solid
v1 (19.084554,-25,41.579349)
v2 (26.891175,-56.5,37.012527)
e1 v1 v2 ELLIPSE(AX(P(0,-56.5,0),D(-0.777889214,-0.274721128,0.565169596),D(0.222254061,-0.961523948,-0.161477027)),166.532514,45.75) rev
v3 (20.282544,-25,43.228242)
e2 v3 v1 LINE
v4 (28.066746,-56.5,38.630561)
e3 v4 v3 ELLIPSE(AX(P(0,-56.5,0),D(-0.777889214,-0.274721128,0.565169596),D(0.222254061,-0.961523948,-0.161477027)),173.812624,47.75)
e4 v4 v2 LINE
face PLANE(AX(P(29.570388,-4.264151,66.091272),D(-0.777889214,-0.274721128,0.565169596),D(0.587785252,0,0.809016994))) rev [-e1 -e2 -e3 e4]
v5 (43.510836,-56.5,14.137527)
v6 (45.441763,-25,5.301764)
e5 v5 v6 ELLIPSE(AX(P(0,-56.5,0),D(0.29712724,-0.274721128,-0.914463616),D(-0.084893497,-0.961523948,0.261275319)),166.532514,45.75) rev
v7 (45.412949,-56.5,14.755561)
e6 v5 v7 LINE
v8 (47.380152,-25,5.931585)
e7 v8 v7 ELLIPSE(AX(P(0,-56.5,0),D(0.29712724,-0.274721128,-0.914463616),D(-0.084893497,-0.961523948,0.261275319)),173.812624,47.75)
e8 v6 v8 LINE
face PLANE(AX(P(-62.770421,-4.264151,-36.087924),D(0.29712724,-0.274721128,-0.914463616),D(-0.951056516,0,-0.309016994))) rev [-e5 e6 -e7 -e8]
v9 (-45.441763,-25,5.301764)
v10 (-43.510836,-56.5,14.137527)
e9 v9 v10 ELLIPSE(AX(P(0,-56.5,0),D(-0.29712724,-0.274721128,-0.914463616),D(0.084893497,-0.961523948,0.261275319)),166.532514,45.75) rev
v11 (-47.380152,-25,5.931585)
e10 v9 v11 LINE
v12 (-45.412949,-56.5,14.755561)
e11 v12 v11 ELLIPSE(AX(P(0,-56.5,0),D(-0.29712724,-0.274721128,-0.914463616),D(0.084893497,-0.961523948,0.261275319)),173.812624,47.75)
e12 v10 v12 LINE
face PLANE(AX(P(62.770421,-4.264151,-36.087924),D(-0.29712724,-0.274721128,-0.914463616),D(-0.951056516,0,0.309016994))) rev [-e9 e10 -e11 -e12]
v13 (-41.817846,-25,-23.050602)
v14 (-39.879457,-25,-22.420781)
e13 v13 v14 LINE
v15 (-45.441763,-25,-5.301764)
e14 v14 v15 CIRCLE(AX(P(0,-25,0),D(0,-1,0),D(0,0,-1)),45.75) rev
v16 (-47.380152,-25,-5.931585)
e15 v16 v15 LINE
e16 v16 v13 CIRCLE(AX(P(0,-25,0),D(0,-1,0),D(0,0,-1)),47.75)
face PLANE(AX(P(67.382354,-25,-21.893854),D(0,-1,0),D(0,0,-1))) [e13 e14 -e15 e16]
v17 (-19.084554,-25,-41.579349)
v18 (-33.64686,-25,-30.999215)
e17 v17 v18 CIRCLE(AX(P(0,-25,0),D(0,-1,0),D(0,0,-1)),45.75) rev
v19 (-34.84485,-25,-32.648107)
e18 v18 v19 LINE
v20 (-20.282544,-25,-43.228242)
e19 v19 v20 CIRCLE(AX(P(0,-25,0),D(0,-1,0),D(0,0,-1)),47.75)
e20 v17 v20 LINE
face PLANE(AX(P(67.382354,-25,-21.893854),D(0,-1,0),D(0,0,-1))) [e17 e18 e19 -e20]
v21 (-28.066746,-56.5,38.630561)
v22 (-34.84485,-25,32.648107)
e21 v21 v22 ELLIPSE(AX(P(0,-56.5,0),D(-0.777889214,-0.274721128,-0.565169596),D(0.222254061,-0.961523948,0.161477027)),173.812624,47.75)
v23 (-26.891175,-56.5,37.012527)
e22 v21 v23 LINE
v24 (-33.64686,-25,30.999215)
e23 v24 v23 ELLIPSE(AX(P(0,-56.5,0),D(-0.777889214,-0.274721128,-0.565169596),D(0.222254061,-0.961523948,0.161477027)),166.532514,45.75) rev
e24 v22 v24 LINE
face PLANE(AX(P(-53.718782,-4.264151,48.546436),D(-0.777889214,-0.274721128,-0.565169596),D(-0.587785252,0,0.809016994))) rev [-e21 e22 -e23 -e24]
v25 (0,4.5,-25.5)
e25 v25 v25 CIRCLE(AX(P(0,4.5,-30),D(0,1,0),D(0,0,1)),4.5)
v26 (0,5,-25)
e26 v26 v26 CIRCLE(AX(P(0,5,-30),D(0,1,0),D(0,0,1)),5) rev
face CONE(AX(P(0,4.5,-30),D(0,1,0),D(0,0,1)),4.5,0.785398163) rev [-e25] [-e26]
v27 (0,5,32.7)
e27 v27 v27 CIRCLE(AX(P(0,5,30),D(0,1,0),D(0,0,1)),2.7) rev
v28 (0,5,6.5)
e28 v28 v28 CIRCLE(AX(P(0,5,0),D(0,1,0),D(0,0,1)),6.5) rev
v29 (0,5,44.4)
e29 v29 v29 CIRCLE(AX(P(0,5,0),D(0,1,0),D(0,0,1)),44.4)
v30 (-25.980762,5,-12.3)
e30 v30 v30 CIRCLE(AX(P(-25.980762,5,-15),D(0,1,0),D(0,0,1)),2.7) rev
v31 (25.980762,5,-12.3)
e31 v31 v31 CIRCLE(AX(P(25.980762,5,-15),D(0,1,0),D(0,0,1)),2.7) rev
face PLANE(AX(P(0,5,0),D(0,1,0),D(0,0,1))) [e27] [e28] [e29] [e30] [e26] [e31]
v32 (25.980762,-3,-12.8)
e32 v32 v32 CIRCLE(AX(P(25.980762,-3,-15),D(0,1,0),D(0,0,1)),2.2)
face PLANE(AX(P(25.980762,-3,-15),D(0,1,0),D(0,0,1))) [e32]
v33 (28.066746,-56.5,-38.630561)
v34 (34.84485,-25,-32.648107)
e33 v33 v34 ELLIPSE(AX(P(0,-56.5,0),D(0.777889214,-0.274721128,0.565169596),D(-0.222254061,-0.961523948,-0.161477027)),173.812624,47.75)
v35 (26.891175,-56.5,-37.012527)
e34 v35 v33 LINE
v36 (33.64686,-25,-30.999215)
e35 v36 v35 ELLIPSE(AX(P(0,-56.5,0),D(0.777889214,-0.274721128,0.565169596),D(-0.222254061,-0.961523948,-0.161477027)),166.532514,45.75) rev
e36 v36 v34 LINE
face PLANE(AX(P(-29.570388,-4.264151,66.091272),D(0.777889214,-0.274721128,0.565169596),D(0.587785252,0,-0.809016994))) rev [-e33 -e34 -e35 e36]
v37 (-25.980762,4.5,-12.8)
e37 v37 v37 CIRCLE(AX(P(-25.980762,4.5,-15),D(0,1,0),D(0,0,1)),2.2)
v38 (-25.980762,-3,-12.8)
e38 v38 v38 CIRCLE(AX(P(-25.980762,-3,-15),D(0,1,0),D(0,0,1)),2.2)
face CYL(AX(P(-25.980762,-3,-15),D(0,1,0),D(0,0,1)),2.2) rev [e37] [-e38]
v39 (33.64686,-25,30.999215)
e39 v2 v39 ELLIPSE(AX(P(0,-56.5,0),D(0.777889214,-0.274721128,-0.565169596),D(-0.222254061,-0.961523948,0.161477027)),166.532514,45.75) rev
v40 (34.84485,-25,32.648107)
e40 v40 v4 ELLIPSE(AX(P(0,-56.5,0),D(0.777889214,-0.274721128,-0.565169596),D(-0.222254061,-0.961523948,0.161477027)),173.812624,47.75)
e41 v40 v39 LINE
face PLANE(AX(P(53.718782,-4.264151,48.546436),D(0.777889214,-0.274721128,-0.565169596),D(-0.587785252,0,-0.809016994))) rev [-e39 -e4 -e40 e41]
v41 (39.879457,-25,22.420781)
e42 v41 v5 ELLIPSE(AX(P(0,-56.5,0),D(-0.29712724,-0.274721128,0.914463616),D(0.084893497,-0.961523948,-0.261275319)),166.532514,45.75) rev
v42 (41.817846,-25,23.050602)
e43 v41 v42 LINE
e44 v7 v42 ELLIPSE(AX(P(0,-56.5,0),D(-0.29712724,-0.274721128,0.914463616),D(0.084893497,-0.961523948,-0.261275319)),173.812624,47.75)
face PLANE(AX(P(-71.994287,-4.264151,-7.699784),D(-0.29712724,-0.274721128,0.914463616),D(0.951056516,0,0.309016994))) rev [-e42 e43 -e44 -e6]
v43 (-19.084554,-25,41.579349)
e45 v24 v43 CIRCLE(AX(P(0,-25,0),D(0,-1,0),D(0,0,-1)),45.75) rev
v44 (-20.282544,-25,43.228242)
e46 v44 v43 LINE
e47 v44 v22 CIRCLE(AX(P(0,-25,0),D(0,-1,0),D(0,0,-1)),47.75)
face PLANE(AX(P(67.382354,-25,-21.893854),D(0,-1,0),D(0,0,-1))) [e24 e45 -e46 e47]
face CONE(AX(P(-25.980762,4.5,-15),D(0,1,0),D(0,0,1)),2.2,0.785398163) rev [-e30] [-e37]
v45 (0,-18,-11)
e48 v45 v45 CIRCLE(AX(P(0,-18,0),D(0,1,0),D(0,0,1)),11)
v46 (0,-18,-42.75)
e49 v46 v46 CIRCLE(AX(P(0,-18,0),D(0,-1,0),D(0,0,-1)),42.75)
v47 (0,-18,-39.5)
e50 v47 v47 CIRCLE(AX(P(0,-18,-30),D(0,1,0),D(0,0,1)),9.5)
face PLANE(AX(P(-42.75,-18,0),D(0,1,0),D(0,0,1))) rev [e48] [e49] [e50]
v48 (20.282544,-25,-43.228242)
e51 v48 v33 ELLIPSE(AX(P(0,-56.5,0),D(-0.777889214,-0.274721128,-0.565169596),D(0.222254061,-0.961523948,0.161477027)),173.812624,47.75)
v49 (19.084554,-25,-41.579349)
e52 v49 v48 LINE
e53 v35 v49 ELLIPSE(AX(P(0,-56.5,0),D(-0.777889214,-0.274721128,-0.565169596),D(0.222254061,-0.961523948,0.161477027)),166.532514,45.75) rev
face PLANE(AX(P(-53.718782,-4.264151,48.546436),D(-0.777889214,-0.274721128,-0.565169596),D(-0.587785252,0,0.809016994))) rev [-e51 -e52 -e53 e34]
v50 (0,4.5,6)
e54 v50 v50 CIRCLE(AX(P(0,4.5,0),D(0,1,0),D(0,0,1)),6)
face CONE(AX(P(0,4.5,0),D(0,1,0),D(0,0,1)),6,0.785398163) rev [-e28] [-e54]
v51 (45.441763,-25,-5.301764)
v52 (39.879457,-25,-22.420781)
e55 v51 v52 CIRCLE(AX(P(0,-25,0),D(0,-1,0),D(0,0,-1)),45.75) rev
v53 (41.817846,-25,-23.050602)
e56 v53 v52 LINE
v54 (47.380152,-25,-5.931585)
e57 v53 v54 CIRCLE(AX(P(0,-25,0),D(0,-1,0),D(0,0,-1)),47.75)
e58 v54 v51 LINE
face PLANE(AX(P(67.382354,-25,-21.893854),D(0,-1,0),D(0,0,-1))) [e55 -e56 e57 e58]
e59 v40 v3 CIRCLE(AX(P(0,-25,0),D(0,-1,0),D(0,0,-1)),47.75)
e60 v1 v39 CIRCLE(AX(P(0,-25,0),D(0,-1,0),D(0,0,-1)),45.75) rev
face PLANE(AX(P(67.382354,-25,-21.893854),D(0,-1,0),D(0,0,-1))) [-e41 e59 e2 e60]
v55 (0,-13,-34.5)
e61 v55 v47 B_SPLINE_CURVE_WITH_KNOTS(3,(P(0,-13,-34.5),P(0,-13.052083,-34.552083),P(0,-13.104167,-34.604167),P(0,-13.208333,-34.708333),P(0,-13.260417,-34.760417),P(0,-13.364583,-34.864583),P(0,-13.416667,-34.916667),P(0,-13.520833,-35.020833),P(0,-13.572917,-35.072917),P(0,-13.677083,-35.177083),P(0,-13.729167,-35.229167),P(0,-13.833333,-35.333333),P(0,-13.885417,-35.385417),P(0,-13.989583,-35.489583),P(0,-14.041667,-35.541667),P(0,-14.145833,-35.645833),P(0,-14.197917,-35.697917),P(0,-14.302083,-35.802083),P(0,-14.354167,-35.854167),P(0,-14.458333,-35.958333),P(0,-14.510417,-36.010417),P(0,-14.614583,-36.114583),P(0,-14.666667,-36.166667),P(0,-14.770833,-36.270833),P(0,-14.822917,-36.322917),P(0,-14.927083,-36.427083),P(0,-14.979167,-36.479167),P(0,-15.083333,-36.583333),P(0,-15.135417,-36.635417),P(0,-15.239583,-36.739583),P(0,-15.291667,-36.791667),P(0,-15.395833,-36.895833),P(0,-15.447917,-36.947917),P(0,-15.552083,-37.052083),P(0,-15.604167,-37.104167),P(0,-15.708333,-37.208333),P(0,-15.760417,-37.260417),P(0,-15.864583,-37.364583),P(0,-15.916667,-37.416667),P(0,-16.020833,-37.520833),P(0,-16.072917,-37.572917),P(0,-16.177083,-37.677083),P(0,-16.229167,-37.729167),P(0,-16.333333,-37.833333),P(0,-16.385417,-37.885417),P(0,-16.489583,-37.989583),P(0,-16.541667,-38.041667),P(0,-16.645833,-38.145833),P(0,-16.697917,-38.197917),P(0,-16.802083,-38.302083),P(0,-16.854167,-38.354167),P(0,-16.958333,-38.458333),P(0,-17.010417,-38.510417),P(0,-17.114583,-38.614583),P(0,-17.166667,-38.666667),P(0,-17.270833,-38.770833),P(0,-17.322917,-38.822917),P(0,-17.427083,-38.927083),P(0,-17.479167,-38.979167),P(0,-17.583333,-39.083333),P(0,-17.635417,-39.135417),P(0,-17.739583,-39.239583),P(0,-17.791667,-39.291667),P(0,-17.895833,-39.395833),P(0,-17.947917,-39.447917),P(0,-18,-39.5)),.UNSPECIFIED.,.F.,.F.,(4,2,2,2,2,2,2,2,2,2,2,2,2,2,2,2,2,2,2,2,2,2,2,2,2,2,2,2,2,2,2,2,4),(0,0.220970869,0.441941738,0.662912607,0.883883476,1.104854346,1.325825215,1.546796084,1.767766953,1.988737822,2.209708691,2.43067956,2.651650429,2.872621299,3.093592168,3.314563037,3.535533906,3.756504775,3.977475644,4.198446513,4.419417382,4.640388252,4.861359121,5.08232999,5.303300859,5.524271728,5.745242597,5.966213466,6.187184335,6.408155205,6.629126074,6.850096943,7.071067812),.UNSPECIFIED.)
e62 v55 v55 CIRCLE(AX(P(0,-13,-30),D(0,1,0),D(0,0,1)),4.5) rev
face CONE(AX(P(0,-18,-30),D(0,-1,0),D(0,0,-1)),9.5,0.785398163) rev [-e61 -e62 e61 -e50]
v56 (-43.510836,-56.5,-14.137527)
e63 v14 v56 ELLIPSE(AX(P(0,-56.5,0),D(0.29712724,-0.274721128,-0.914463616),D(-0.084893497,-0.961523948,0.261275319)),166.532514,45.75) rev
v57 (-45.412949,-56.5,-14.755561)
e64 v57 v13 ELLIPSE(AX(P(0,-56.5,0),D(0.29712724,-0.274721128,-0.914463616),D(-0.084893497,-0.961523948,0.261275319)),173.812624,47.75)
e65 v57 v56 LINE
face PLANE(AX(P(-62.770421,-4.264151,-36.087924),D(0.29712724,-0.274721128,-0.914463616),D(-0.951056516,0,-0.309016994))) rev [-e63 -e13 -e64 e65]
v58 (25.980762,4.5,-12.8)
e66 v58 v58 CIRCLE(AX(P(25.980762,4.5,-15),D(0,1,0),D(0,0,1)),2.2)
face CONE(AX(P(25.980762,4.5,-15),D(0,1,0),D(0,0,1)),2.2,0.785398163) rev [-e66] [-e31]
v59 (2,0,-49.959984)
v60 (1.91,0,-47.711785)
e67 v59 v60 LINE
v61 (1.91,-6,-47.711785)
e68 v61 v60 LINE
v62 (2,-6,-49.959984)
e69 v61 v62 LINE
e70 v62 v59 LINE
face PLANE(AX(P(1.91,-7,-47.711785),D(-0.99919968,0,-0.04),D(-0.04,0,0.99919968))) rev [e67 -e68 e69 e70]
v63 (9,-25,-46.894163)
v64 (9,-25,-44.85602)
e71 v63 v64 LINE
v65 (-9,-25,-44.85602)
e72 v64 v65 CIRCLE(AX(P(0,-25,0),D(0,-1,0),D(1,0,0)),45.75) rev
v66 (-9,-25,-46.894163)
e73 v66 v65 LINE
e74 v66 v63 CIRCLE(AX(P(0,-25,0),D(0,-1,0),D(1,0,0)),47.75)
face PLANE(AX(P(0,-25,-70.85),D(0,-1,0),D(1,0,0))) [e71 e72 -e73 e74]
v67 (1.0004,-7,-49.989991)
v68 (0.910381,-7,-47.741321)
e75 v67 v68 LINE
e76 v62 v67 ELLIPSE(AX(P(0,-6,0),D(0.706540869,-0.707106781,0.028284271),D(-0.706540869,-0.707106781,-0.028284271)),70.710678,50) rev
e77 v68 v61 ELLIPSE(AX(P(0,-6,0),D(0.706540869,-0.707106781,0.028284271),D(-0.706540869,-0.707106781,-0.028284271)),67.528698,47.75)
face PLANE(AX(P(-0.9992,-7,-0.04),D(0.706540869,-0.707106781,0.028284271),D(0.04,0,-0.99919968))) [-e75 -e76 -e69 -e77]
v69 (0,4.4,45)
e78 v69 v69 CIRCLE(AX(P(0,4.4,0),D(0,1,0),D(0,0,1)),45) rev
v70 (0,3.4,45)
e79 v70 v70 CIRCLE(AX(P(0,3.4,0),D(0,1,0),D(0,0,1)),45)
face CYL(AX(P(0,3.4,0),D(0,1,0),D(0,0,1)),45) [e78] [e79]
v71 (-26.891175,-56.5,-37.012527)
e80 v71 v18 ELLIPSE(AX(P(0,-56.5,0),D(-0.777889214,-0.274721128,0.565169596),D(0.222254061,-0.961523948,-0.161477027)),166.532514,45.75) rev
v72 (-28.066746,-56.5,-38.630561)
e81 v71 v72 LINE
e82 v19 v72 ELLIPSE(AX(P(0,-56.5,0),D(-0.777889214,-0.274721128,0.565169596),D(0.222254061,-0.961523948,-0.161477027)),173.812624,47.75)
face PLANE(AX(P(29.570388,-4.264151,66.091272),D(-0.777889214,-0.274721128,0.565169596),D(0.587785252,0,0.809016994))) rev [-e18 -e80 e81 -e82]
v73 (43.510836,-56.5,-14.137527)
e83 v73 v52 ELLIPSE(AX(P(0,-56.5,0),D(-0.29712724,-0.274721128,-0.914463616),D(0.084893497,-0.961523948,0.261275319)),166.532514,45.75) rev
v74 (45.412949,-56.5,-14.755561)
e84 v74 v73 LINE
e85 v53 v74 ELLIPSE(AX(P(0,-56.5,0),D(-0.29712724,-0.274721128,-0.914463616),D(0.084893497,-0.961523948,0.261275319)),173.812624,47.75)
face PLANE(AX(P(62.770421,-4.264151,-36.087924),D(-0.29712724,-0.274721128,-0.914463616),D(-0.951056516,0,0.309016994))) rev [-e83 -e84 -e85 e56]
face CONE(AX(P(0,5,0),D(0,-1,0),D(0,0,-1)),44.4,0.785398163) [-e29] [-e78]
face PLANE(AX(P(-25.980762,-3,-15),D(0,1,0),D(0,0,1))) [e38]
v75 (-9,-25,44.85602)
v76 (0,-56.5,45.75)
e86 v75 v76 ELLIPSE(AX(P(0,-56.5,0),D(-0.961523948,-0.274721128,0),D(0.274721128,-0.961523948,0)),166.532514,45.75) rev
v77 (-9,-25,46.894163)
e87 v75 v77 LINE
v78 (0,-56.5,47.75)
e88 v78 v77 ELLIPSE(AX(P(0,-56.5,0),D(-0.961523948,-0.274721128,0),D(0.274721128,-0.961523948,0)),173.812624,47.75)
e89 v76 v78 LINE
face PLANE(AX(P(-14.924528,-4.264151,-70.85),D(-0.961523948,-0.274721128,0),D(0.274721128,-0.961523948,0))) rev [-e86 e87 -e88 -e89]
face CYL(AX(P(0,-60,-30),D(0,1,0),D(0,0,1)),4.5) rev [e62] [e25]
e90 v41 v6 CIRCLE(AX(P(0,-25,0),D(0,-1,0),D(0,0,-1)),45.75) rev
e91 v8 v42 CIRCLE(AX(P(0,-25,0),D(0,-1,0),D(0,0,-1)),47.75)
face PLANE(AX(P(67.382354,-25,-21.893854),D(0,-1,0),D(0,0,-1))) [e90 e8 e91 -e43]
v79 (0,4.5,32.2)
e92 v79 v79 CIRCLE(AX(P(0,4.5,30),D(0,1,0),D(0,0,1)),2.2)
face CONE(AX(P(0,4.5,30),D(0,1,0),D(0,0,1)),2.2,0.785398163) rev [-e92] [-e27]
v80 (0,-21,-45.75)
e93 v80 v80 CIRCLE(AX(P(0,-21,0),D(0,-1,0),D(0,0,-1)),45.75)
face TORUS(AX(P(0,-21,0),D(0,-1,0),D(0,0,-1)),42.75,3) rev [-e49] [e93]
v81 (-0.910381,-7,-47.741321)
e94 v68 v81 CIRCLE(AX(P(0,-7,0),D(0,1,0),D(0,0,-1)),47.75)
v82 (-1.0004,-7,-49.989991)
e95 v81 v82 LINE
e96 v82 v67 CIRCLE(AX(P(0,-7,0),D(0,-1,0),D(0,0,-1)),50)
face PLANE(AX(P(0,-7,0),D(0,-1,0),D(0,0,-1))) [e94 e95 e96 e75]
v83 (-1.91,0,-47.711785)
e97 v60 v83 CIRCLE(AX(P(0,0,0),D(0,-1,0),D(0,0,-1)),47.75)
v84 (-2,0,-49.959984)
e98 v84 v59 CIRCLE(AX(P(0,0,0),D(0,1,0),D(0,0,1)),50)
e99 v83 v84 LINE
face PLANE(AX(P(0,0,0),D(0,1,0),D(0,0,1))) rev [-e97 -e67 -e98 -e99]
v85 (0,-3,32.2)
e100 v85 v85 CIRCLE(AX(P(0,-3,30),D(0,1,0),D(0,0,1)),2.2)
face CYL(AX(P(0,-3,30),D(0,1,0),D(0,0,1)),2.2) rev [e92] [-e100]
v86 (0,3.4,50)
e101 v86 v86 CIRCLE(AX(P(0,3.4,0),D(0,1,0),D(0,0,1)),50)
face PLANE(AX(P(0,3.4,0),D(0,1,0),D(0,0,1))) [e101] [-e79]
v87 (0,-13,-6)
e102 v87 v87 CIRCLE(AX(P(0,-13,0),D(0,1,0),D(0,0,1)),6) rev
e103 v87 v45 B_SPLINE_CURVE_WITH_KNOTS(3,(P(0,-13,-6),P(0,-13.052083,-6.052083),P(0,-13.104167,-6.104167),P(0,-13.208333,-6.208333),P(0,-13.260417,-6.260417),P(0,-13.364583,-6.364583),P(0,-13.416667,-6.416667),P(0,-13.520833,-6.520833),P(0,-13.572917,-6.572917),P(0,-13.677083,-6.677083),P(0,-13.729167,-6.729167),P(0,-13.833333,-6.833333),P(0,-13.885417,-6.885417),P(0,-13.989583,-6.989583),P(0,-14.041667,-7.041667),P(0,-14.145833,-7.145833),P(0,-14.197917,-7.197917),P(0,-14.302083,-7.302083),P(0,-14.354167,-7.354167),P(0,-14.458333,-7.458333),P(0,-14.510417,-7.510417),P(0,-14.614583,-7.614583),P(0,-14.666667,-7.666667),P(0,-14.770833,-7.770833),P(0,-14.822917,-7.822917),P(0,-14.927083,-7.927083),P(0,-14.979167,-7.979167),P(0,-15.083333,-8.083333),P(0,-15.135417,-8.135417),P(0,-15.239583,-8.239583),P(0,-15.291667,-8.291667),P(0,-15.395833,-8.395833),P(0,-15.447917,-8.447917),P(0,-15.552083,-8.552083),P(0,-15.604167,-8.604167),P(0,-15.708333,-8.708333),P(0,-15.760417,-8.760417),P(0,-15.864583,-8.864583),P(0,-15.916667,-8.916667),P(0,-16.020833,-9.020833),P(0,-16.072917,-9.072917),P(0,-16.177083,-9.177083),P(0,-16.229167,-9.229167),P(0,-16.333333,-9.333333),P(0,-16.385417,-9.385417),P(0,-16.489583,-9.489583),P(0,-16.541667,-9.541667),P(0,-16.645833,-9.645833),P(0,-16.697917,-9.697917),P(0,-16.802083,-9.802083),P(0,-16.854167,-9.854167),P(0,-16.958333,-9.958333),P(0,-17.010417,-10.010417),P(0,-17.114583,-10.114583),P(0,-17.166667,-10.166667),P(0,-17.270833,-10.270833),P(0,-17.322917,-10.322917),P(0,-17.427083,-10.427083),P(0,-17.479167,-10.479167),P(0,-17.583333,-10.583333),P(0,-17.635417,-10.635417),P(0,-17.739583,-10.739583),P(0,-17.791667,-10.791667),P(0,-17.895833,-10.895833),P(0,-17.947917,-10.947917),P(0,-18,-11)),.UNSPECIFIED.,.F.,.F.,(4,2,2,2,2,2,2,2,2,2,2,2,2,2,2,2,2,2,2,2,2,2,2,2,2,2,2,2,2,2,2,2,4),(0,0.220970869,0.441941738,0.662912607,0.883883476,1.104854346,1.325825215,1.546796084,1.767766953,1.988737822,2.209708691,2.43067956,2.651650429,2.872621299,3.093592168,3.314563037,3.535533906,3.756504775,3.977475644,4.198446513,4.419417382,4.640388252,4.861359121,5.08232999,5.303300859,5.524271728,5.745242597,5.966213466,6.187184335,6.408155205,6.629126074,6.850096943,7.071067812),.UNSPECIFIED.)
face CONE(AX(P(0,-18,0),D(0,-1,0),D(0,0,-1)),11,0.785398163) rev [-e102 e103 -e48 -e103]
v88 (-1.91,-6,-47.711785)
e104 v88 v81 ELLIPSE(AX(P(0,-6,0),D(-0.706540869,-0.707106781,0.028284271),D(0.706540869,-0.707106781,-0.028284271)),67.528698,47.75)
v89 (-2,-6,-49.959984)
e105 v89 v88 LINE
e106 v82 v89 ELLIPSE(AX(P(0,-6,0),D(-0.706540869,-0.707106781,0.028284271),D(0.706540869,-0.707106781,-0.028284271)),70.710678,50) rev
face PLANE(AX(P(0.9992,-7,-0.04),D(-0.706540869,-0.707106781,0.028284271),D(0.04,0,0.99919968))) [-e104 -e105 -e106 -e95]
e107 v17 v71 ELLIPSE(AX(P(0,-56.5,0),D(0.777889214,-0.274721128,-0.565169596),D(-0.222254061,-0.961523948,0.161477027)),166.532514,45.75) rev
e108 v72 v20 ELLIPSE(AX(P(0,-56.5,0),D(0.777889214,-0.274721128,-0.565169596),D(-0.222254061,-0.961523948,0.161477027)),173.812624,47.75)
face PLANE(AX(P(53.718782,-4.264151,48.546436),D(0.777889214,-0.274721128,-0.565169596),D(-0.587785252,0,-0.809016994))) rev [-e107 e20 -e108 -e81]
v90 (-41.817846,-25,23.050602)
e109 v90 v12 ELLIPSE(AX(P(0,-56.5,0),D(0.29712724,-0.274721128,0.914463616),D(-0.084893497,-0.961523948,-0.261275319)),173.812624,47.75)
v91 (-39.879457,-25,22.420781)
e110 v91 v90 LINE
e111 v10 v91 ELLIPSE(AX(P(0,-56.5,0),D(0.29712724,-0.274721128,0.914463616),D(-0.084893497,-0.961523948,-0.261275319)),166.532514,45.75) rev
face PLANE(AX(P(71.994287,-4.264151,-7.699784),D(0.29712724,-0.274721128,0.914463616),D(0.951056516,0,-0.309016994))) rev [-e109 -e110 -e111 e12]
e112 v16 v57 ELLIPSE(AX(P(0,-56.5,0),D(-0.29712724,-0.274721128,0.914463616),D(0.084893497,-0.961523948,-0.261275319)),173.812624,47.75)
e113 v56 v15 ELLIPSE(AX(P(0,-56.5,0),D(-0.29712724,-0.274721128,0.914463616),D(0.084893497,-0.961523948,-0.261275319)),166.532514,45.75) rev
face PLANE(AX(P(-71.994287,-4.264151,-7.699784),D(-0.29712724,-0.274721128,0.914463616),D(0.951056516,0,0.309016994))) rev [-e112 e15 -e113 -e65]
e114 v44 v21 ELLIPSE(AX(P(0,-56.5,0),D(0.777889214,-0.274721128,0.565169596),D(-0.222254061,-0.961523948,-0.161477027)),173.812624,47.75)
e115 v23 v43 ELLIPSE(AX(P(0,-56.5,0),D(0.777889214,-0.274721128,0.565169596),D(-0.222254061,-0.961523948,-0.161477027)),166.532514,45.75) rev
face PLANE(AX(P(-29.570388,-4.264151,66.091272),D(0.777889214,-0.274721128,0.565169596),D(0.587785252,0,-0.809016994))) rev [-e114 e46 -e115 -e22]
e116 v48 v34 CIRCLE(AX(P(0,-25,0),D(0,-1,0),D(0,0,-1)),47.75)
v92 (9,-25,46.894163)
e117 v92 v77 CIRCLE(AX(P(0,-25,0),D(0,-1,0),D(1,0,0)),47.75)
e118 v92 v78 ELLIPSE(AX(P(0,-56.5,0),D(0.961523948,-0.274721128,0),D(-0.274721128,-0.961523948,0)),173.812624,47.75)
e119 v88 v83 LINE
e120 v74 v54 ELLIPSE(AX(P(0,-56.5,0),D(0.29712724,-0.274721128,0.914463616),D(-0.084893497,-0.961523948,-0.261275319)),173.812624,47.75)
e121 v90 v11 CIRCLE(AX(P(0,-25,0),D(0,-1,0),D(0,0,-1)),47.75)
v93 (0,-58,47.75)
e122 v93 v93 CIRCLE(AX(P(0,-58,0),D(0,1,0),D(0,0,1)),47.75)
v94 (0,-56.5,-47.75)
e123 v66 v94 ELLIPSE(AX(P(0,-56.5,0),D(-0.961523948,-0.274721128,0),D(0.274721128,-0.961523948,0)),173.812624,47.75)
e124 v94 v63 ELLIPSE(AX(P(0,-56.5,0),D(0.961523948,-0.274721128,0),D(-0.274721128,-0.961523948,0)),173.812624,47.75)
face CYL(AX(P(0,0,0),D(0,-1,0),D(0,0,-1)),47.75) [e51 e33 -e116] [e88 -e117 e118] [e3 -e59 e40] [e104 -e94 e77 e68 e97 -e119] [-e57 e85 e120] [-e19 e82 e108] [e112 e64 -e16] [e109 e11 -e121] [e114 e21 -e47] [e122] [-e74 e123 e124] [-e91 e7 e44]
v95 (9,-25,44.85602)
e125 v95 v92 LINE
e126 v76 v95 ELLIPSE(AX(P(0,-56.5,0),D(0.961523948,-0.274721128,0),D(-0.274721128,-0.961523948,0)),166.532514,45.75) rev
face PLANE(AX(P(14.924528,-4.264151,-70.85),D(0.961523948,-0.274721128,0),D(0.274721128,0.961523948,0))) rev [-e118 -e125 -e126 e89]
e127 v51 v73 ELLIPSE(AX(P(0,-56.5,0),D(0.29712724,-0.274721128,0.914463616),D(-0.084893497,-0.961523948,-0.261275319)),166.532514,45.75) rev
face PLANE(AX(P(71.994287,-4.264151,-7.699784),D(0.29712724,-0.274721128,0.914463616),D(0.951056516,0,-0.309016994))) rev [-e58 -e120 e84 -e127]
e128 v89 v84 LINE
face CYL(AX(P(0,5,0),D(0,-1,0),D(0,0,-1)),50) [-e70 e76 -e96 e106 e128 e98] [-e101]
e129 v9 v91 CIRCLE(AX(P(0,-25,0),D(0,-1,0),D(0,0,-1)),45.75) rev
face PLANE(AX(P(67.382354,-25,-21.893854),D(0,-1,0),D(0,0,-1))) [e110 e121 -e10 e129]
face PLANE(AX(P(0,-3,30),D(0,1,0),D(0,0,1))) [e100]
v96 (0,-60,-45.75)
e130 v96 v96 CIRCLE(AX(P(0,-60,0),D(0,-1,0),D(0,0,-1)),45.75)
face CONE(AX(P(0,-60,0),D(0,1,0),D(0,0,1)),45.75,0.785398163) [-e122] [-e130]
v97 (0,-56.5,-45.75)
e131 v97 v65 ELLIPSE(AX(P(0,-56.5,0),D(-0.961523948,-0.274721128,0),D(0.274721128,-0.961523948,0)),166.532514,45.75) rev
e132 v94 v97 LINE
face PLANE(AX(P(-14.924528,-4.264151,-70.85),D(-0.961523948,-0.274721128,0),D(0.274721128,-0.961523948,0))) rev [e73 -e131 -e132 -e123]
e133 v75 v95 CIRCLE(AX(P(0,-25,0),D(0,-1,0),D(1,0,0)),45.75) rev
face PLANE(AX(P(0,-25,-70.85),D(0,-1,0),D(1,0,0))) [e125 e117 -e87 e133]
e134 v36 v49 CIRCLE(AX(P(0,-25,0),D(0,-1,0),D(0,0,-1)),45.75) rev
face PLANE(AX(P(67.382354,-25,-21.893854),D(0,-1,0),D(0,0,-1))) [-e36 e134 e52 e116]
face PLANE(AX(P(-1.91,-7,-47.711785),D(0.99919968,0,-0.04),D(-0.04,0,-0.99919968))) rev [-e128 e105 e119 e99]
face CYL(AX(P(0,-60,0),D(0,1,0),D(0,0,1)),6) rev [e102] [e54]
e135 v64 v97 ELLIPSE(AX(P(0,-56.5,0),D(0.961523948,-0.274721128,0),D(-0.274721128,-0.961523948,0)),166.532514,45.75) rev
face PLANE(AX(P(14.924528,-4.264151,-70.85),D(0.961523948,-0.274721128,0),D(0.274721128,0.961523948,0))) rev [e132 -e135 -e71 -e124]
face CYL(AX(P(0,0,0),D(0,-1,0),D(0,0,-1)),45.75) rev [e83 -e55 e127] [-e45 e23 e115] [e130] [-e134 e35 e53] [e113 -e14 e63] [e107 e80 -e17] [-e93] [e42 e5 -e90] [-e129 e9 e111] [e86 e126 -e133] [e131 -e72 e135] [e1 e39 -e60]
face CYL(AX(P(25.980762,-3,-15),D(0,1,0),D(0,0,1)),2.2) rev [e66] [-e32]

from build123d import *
from build123d.topology import SkipClean

# Parameters (mm, degrees)
CUT_EXTRUDE_748_DEPTH      = 70.85
PATTERN_CIRCULAR_802_COUNT = 5
SKETCH_7_R                 = 50
EXTRUDE_1_DEPTH            = 5
CUT_EXTRUDE_START          = -1.6
SKETCH_8_R                 = 50
SKETCH_8_R_2               = 45
CUT_EXTRUDE_1_DEPTH        = 1.6
SKETCH_9_R                 = 6
CUT_EXTRUDE_2_DEPTH        = 97.046863561
SKETCH_10_R                = 4.5
CUT_EXTRUDE_4_DEPTH        = 97.046863561
SKETCH_10_4_R              = 2.2
CUT_EXTRUDE_5_DEPTH        = 8
CHAMFER_1_SIZE             = 0.5
CHAMFER_2_SIZE             = 0.5
CHAMFER_3_SIZE             = 5
EXTRUDE_START              = 7
EXTRUDE_2_DEPTH            = 7
CHAMFER_4_SIZE             = 1
CHAMFER_5_SIZE             = 2
CHAMFER_6_SIZE             = 0.6


with BuildPart() as part:
    # Эскиз2 → Revolve 380 (revolve)
    with BuildSketch(Plane.XY, mode=Mode.PRIVATE) as revolve_380_sk:
        with BuildLine():
            Line((0, 0), (-47.75, 0))
            Line((-47.75, 0), (-47.75, -60))
            Line((-47.75, -60), (-45.75, -60))
            Line((-45.75, -60), (-45.75, -21))
            ThreePointArc((-45.75, -21), (-44.871320344, -18.878679656), (-42.75, -18))
            Line((-42.75, -18), (0, -18))
            Line((0, -18), (0, 0))
        make_face()
    revolve(revolve_380_sk.sketch.rotate(Axis((0, 0, 0), (0, 1, 0)), 270), axis=Axis((0, 0, 0), (0, 1, 0)))

    # Эскиз4 → Cut-Extrude 748 (cut, symmetric)
    with BuildSketch(Plane.XY):
        Polygon((-9, -25), (0, -56.5), (9, -25), align=None)
    cut_extrude_748 = extrude(amount=CUT_EXTRUDE_748_DEPTH, both=True, mode=Mode.SUBTRACT)

    # Pattern Circular 802: Cut-Extrude 748 ×5 about axis
    pattern_circular_802_axis = Axis((0, 0, 0), (0, 1, 0))
    for i in range(1, PATTERN_CIRCULAR_802_COUNT):
        add(cut_extrude_748.rotate(pattern_circular_802_axis, i * 360 / PATTERN_CIRCULAR_802_COUNT), mode=Mode.SUBTRACT)

    # Эскиз7 → Бобышка-Вытянуть1 (add)
    with BuildSketch(Plane(origin=(0, 0, 0), x_dir=(1, 0, 0), z_dir=(0, 1, 0))):
        with Locations(Location((0, 0, 0), (0, 0, 270))):
            Circle(SKETCH_7_R)
    extrude(amount=EXTRUDE_1_DEPTH)

    # Эскиз8 → Вырез-Вытянуть1 (cut)
    with BuildSketch(Plane(origin=(0, 5, 0), x_dir=(1, 0, 0), z_dir=(0, 1, 0)).offset(CUT_EXTRUDE_START)):
        with Locations(Location((0, 0, 0), (0, 0, 270))):
            Circle(SKETCH_8_R)
        with Locations(Location((0, 0, 0), (0, 0, 270))):
            Circle(SKETCH_8_R_2, mode=Mode.SUBTRACT)
    extrude(amount=CUT_EXTRUDE_1_DEPTH, mode=Mode.SUBTRACT)

    # Эскиз9 → Вырез-Вытянуть2 (cut, through all)
    with BuildSketch(Plane(origin=(0, 5, 0), x_dir=(1, 0, 0), z_dir=(0, 1, 0))):
        with Locations(Location((0, 0, 0), (0, 0, 270))):
            Circle(SKETCH_9_R)
    extrude(amount=-CUT_EXTRUDE_2_DEPTH, mode=Mode.SUBTRACT)

    # Эскиз10 → Вырез-Вытянуть4 (cut, through all)
    with BuildSketch(Plane(origin=(0, 5, 0), x_dir=(1, 0, 0), z_dir=(0, 1, 0))):
        with Locations(Location((0, 30, 0), (0, 0, 270))):
            Circle(SKETCH_10_R)
    extrude(amount=-CUT_EXTRUDE_4_DEPTH, mode=Mode.SUBTRACT)

    # Эскиз10<4> → Вырез-Вытянуть5 (cut)
    with BuildSketch(Plane(origin=(0, 5, 0), x_dir=(1, 0, 0), z_dir=(0, 1, 0))):
        with Locations(Location((0, -30, 0), (0, 0, 270))):
            Circle(SKETCH_10_4_R)
        with Locations(Location((-25.980762114, 15, 0), (0, 0, 270))):
            Circle(SKETCH_10_4_R)
        with Locations(Location((25.980762114, 15, 0), (0, 0, 270))):
            Circle(SKETCH_10_4_R)
    extrude(amount=-CUT_EXTRUDE_5_DEPTH, mode=Mode.SUBTRACT)

    # Фаска1
    chamfer_1_edges = [part.edges().sort_by_distance(p)[0] for p in [
        (0, 5, -34.5),
        (-25.980762114, 5, -17.2),
        (25.980762114, 5, -17.2),
        (0, 5, 27.8),
    ]]
    chamfer(chamfer_1_edges, length=CHAMFER_1_SIZE)

    # Фаска2
    chamfer_2_edges = [part.edges().sort_by_distance(p)[0] for p in [
        (0, 5, -6),
    ]]
    chamfer(chamfer_2_edges, length=CHAMFER_2_SIZE)

    # Фаска3
    chamfer_3_edges = [part.edges().sort_by_distance(p)[0] for p in [
        (0, -18, -6),
        (0, -18, -34.5),
    ]]
    chamfer(chamfer_3_edges, length=CHAMFER_3_SIZE)

    # Эскиз13 → Бобышка-Вытянуть2 (add)
    with SkipClean():  # the faces are left unmerged after this step: merging them gives an invalid solid
        with BuildSketch(Plane.XZ.offset(EXTRUDE_START)):
            with BuildLine():
                Line((-1.91, -47.711784708), (-2, -49.959983987))
                ThreePointArc((-2, -49.959983987), (0, -50), (2, -49.959983987))
                Line((2, -49.959983987), (1.91, -47.711784708))
                ThreePointArc((1.91, -47.711784708), (0, -47.75), (-1.91, -47.711784708))
            make_face()
        extrude(amount=-EXTRUDE_2_DEPTH)

    # Фаска4
    chamfer_4_edges = [part.edges().sort_by_distance(p)[0] for p in [
        (1.955, -7, -48.835884347),
        (-1.955, -7, -48.835884347),
    ]]
    chamfer(chamfer_4_edges, length=CHAMFER_4_SIZE)

    # Фаска5
    chamfer_5_edges = [part.edges().sort_by_distance(p)[0] for p in [
        (0, -60, 47.75),
    ]]
    chamfer(chamfer_5_edges, length=CHAMFER_5_SIZE - 0.0001)  # a hair under: the kernel refuses the full size

    # Фаска6
    chamfer_6_edges = [part.edges().sort_by_distance(p)[0] for p in [
        (0, 5, -45),
    ]]
    chamfer(chamfer_6_edges, length=CHAMFER_6_SIZE)


solid = part.part
